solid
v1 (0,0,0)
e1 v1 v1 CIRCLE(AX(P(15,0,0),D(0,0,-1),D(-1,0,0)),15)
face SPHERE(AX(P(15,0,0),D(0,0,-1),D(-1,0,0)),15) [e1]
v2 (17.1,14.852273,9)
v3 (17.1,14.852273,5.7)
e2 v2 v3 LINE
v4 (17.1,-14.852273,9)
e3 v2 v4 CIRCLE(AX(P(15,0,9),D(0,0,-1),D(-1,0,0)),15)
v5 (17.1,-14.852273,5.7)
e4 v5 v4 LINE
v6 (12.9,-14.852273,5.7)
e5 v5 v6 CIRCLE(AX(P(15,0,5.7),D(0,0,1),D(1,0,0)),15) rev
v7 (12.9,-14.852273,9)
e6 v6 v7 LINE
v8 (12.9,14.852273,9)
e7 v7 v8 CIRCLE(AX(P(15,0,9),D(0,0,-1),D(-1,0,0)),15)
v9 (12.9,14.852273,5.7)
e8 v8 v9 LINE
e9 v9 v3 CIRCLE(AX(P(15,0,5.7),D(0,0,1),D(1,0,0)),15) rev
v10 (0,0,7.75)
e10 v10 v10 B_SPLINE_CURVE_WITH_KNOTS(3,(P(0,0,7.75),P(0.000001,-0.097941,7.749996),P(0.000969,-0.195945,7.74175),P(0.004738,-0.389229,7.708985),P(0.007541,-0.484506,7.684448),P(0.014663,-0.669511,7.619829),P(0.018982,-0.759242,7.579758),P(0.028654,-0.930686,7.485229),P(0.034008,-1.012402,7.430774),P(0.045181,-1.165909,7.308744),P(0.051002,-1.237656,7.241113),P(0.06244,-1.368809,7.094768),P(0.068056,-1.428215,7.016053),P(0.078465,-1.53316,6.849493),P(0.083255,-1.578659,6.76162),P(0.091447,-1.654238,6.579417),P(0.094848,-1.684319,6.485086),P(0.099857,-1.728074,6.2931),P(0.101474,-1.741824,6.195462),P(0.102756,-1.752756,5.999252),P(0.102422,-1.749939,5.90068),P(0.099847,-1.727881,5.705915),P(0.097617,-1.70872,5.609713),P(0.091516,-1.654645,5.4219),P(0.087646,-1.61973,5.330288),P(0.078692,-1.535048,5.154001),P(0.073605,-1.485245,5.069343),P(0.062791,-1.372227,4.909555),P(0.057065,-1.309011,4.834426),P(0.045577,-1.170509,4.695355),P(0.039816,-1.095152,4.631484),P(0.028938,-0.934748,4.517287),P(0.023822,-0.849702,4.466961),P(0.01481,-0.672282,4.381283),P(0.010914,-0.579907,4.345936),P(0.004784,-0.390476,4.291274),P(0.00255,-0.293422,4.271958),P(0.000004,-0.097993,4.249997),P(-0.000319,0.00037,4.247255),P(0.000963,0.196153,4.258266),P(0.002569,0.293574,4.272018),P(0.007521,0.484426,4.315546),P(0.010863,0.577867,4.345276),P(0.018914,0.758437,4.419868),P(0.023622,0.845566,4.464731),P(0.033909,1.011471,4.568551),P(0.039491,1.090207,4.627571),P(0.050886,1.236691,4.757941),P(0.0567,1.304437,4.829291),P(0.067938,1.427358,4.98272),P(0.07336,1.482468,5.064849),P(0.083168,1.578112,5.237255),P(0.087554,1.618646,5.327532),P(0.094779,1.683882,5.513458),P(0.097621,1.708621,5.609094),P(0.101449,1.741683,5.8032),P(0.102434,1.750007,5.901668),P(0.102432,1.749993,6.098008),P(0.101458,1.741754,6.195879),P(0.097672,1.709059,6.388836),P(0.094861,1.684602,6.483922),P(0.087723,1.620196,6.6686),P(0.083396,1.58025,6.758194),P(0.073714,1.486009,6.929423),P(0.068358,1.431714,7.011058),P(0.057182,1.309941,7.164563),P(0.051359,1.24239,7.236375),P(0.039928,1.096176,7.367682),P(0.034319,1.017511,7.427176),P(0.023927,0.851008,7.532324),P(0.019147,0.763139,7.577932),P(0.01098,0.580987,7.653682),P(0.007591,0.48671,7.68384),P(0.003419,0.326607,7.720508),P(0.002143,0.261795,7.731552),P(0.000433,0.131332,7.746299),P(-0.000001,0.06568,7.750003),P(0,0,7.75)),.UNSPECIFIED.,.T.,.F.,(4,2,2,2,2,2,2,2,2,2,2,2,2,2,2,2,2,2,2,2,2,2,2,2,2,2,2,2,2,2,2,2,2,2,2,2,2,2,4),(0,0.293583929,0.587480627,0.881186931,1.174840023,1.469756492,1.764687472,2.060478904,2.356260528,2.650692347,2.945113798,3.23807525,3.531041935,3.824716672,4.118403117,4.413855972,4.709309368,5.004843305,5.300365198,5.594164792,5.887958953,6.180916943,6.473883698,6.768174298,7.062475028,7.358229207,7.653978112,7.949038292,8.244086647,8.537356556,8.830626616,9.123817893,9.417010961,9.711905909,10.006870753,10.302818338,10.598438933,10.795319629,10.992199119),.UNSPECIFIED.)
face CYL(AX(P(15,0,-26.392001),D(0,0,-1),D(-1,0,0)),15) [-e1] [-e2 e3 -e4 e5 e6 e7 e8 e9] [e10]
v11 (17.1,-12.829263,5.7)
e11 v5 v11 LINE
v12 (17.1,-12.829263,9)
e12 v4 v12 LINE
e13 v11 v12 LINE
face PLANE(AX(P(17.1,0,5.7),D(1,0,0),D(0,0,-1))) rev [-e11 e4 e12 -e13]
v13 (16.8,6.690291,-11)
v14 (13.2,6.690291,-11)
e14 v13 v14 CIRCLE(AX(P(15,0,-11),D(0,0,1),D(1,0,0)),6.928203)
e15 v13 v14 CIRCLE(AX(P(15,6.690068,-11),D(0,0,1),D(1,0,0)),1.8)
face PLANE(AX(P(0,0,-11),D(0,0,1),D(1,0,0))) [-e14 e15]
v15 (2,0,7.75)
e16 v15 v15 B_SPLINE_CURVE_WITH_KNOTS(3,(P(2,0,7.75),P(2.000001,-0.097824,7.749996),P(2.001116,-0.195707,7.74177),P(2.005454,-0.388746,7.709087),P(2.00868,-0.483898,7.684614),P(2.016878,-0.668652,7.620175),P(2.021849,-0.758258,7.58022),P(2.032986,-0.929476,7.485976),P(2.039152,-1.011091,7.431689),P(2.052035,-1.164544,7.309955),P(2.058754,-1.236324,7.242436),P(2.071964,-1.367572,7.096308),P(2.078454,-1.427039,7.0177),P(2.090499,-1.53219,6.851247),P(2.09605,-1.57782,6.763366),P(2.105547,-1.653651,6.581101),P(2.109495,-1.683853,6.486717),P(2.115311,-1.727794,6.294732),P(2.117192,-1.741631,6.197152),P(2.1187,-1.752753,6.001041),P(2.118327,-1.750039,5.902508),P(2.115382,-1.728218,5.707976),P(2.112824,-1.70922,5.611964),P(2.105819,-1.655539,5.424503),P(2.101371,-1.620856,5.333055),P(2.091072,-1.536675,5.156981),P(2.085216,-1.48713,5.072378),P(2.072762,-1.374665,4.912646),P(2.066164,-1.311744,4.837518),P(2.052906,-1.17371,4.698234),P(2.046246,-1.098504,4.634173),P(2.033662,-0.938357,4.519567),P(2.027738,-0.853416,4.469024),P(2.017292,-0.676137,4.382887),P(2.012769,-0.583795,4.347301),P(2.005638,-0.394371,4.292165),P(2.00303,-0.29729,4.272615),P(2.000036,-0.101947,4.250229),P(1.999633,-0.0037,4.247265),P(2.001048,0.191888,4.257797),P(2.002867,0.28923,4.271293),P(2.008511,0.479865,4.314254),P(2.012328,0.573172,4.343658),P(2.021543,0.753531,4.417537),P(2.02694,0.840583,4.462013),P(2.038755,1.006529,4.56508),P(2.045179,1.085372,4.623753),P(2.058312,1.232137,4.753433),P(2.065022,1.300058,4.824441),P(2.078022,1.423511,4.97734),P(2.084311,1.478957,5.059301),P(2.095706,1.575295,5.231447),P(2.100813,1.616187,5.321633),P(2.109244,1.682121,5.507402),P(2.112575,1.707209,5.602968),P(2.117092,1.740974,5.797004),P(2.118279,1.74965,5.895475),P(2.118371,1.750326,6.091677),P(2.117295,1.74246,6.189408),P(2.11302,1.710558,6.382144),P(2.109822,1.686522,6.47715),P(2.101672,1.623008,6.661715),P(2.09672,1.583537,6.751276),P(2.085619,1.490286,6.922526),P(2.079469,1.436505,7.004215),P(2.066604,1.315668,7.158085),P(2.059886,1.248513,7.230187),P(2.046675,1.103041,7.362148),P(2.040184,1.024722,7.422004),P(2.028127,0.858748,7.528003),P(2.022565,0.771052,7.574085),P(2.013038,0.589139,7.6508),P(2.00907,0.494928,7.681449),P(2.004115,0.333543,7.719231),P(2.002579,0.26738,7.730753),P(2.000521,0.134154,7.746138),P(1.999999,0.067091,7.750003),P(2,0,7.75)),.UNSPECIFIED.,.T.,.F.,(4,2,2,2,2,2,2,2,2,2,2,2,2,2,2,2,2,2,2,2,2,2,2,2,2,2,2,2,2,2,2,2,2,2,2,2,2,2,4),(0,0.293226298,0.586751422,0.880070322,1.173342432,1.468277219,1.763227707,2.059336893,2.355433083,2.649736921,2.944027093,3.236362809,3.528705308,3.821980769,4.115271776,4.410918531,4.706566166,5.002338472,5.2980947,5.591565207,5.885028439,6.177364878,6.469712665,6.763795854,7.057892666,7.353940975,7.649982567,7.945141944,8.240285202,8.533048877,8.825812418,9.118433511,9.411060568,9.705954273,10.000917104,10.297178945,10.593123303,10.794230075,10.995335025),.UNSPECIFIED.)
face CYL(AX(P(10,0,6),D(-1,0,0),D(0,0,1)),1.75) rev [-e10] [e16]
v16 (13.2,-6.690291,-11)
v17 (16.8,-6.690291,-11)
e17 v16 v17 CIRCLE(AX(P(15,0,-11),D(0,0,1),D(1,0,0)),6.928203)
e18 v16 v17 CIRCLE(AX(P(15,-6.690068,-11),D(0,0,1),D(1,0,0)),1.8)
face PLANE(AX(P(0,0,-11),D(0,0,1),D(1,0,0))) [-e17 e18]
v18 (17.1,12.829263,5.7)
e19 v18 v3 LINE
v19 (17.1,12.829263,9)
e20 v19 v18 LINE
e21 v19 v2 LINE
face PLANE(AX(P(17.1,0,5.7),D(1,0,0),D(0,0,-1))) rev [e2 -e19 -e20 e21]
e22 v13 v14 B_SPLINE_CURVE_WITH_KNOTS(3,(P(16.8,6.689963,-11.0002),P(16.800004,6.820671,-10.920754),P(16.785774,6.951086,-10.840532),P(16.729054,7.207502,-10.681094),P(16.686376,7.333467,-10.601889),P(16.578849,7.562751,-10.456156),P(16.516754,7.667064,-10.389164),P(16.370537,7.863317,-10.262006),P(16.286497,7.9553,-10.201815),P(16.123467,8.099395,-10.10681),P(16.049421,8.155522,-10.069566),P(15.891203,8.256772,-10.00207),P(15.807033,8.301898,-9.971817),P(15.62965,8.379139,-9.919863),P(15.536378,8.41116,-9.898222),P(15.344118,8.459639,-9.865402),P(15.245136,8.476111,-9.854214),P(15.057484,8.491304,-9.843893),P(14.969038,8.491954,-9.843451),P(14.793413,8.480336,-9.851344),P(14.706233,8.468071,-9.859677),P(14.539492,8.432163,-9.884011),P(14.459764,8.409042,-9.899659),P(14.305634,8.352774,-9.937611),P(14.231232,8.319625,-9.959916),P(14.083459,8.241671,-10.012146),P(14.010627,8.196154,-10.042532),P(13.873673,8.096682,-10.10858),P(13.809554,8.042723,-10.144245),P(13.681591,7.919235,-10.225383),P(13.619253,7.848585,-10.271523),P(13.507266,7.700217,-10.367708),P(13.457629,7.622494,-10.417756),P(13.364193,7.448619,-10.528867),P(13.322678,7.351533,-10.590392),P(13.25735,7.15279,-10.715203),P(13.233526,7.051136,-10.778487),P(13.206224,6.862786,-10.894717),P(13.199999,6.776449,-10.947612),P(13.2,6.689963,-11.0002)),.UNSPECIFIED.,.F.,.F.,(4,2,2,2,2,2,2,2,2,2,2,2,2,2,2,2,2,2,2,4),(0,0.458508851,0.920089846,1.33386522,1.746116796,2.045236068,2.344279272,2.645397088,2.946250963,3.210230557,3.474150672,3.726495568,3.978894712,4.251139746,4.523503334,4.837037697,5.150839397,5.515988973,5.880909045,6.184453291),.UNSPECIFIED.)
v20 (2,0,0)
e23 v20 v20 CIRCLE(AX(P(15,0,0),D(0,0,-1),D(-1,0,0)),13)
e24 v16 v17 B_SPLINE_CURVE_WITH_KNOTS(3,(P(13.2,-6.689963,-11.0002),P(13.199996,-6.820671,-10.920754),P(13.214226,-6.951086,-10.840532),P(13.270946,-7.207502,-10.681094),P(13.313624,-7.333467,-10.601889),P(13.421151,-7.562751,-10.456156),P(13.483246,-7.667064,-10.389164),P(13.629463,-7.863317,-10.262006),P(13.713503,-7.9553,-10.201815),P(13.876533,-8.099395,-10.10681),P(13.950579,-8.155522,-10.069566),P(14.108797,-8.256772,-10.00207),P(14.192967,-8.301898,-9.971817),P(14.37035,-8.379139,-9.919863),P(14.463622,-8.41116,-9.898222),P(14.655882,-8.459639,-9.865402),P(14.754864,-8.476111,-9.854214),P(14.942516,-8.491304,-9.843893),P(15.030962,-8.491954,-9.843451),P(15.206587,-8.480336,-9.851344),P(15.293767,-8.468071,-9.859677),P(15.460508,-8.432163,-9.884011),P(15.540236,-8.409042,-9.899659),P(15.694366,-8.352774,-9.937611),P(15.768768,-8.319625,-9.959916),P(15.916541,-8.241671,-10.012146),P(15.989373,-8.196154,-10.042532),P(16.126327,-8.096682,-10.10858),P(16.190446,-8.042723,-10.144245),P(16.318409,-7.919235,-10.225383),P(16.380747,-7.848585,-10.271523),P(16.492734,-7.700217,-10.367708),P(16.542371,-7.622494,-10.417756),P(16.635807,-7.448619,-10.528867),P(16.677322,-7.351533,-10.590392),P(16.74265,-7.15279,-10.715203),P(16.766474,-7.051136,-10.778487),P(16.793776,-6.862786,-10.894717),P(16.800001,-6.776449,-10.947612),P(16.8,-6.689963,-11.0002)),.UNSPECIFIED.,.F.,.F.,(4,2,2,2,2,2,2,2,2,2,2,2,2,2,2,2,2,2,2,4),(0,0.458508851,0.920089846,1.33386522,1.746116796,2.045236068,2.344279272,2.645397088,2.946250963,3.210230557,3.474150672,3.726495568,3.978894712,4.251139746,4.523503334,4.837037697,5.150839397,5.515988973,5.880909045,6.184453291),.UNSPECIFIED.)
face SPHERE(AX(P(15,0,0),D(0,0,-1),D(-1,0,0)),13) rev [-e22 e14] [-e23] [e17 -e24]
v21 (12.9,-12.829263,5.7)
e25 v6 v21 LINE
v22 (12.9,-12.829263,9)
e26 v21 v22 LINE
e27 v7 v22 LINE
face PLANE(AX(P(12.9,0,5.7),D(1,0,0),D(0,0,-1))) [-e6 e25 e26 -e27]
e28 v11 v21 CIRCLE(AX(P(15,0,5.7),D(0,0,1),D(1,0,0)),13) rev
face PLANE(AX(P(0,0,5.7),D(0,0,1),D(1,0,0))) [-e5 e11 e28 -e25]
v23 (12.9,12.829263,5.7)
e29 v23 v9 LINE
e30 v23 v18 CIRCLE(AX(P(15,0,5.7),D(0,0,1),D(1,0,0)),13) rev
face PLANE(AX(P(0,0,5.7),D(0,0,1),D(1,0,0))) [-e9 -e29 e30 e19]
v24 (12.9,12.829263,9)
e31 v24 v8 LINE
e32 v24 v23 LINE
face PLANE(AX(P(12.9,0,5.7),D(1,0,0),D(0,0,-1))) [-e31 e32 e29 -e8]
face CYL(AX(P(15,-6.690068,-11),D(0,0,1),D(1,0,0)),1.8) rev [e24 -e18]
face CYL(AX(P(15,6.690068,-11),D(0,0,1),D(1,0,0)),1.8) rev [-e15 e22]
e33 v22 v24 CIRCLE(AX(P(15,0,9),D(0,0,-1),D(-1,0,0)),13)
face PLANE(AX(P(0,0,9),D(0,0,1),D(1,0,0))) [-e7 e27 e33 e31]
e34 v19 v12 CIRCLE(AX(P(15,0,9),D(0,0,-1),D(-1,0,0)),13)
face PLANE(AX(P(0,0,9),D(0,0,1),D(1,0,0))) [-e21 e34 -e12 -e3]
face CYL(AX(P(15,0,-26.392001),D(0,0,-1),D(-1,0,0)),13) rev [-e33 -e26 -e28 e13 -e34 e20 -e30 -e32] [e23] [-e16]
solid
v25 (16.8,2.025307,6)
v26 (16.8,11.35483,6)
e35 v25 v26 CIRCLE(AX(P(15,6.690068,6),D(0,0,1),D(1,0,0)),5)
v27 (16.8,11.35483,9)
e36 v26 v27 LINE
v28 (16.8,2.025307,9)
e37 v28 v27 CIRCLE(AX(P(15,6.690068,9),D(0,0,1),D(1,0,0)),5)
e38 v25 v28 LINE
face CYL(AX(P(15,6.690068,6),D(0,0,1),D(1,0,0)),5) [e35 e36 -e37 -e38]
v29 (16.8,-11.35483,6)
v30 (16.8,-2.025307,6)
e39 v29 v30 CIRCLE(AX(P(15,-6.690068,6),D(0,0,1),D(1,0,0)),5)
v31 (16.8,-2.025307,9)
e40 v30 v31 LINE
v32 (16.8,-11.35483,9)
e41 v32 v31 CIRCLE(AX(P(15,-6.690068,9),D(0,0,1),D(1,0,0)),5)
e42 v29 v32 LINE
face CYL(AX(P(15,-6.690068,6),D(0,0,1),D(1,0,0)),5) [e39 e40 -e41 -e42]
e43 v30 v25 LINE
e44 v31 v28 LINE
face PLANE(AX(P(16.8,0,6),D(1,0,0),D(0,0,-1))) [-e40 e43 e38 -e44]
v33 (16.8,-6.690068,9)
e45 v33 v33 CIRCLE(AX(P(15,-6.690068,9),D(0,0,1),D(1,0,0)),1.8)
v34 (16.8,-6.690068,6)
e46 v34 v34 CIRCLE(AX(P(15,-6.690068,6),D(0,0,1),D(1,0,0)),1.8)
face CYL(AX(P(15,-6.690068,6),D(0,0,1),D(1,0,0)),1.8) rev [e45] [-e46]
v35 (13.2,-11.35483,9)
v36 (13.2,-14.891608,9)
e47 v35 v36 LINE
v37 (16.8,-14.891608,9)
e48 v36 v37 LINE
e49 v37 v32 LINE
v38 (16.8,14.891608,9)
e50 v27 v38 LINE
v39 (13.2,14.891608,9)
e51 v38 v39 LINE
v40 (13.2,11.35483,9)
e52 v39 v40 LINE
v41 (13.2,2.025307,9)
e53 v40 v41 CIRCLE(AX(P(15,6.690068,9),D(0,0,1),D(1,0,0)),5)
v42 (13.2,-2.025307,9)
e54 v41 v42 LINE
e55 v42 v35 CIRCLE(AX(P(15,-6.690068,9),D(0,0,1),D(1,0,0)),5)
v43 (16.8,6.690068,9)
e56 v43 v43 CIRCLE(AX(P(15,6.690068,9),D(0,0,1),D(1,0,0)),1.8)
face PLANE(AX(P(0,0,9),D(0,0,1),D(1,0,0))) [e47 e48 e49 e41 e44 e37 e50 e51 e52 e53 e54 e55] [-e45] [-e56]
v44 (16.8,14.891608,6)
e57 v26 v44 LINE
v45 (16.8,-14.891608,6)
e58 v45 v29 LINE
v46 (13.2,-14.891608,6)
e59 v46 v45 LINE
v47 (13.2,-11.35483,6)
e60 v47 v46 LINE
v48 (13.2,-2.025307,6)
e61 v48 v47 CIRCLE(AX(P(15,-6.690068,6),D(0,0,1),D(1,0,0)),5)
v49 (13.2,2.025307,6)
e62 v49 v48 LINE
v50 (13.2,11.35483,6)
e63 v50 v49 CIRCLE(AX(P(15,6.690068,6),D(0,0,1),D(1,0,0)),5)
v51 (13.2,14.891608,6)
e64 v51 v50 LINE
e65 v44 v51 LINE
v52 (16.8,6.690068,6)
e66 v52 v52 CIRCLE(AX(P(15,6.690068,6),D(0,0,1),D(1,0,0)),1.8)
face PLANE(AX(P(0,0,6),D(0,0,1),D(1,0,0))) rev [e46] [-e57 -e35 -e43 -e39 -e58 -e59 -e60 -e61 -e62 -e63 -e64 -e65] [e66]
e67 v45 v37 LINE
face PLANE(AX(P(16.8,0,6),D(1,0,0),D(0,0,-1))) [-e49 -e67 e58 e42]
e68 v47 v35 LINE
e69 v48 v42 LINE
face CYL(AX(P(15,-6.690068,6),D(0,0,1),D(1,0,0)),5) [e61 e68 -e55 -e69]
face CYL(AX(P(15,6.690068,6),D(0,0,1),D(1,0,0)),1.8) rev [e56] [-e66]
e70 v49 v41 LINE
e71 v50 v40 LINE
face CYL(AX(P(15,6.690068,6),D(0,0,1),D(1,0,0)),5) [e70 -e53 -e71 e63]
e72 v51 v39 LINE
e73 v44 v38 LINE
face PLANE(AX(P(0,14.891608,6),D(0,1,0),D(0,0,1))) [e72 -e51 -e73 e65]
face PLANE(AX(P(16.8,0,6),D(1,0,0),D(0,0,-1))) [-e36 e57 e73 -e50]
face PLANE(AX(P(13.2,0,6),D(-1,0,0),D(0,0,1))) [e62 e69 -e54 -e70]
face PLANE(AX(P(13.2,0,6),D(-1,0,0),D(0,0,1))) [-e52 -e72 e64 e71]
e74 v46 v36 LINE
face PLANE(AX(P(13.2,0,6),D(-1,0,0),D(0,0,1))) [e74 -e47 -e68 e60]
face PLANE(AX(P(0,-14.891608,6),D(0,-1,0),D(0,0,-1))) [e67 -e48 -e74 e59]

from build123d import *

# Parameters (mm, degrees)
SKETCH4_R           = 1.75
CUT_EXTRUDE1_DEPTH  = 10
SKETCH5_R           = 1.8
BOSS_EXTRUDE1_DEPTH = 3
SKETCH5_3_R         = 1.8
CUT_EXTRUDE3_DEPTH  = 20
CUT_EXTRUDE4_DEPTH  = 3.3


with BuildPart() as part:
    # Sketch2 → Revolve3 (revolve)
    with BuildSketch(Plane(origin=(0, 0, 0), x_dir=(1, 0, 0), z_dir=(0, 1, 0))):
        with BuildLine():
            ThreePointArc((15, 15), (4.393398282, 10.606601718), (0, 0))
            Line((0, 0), (0, -9))
            Line((0, -9), (2, -9))
            Line((2, -9), (2, 0))
            ThreePointArc((2, 0), (5.807611845, 9.192388155), (15, 13))
            Line((15, 13), (15, 15))
        make_face()
    revolve(axis=Axis((15, 0, -26.392000581), (0, 0, 1)))

    # Sketch4 → Cut-Extrude1 (cut)
    with BuildSketch(Plane(origin=(0, 0, 0), x_dir=(0, 0, -1), z_dir=(1, 0, 0))):
        with Locations((-6, 0)):
            Circle(SKETCH4_R)
    extrude(amount=CUT_EXTRUDE1_DEPTH, mode=Mode.SUBTRACT)

    # Sketch5<3> → Cut-Extrude3 (cut)
    with BuildSketch(Plane.XY.offset(9)):
        with Locations((15, -6.690068277)):
            Circle(SKETCH5_3_R)
        with Locations((15, 6.690068277)):
            Circle(SKETCH5_3_R)
    extrude(amount=-CUT_EXTRUDE3_DEPTH, mode=Mode.SUBTRACT)

    # Sketch5<5> → Cut-Extrude4 (cut)
    with BuildSketch(Plane.XY.offset(9)):
        with BuildLine():
            ThreePointArc((17.1, -11.227688799), (15, -11.690068277), (12.9, -11.227688799))
            Line((12.9, -11.227688799), (12.9, -15))
            Line((12.9, -15), (17.1, -15))
            Line((17.1, -15), (17.1, -11.227688799))
        make_face()
        with BuildLine():
            Line((17.1, 11.227688799), (17.1, 15))
            Line((17.1, 15), (12.9, 15))
            Line((12.9, 15), (12.9, 11.227688799))
            ThreePointArc((12.9, 11.227688799), (15, 11.690068277), (17.1, 11.227688799))
        make_face()
    extrude(amount=-CUT_EXTRUDE4_DEPTH, mode=Mode.SUBTRACT)


with BuildPart() as body_2:
    # Sketch5 → Boss-Extrude1 (new body)
    with BuildSketch(Plane.XY.offset(9)):
        with BuildLine():
            Line((13.2, -11.354829793), (13.2, -14.891608375))
            Line((13.2, -14.891608375), (16.8, -14.891608375))
            Line((16.8, -14.891608375), (16.8, -11.354829793))
            ThreePointArc((16.8, -11.354829793), (20, -6.690068277), (16.8, -2.025306761))
            Line((16.8, -2.025306761), (16.8, 2.025306761))
            ThreePointArc((16.8, 2.025306761), (20, 6.690068277), (16.8, 11.354829793))
            Line((16.8, 11.354829793), (16.8, 14.891608375))
            Line((16.8, 14.891608375), (13.2, 14.891608375))
            Line((13.2, 14.891608375), (13.2, 11.354829793))
            ThreePointArc((13.2, 11.354829793), (10, 6.690068277), (13.2, 2.025306761))
            Line((13.2, 2.025306761), (13.2, -2.025306761))
            ThreePointArc((13.2, -2.025306761), (10, -6.690068277), (13.2, -11.354829793))
        make_face()
        with Locations((15, -6.690068277)):
            Circle(SKETCH5_R, mode=Mode.SUBTRACT)
        with Locations((15, 6.690068277)):
            Circle(SKETCH5_R, mode=Mode.SUBTRACT)
    extrude(amount=-BOSS_EXTRUDE1_DEPTH)


solid = Compound([part.part, body_2.part])
